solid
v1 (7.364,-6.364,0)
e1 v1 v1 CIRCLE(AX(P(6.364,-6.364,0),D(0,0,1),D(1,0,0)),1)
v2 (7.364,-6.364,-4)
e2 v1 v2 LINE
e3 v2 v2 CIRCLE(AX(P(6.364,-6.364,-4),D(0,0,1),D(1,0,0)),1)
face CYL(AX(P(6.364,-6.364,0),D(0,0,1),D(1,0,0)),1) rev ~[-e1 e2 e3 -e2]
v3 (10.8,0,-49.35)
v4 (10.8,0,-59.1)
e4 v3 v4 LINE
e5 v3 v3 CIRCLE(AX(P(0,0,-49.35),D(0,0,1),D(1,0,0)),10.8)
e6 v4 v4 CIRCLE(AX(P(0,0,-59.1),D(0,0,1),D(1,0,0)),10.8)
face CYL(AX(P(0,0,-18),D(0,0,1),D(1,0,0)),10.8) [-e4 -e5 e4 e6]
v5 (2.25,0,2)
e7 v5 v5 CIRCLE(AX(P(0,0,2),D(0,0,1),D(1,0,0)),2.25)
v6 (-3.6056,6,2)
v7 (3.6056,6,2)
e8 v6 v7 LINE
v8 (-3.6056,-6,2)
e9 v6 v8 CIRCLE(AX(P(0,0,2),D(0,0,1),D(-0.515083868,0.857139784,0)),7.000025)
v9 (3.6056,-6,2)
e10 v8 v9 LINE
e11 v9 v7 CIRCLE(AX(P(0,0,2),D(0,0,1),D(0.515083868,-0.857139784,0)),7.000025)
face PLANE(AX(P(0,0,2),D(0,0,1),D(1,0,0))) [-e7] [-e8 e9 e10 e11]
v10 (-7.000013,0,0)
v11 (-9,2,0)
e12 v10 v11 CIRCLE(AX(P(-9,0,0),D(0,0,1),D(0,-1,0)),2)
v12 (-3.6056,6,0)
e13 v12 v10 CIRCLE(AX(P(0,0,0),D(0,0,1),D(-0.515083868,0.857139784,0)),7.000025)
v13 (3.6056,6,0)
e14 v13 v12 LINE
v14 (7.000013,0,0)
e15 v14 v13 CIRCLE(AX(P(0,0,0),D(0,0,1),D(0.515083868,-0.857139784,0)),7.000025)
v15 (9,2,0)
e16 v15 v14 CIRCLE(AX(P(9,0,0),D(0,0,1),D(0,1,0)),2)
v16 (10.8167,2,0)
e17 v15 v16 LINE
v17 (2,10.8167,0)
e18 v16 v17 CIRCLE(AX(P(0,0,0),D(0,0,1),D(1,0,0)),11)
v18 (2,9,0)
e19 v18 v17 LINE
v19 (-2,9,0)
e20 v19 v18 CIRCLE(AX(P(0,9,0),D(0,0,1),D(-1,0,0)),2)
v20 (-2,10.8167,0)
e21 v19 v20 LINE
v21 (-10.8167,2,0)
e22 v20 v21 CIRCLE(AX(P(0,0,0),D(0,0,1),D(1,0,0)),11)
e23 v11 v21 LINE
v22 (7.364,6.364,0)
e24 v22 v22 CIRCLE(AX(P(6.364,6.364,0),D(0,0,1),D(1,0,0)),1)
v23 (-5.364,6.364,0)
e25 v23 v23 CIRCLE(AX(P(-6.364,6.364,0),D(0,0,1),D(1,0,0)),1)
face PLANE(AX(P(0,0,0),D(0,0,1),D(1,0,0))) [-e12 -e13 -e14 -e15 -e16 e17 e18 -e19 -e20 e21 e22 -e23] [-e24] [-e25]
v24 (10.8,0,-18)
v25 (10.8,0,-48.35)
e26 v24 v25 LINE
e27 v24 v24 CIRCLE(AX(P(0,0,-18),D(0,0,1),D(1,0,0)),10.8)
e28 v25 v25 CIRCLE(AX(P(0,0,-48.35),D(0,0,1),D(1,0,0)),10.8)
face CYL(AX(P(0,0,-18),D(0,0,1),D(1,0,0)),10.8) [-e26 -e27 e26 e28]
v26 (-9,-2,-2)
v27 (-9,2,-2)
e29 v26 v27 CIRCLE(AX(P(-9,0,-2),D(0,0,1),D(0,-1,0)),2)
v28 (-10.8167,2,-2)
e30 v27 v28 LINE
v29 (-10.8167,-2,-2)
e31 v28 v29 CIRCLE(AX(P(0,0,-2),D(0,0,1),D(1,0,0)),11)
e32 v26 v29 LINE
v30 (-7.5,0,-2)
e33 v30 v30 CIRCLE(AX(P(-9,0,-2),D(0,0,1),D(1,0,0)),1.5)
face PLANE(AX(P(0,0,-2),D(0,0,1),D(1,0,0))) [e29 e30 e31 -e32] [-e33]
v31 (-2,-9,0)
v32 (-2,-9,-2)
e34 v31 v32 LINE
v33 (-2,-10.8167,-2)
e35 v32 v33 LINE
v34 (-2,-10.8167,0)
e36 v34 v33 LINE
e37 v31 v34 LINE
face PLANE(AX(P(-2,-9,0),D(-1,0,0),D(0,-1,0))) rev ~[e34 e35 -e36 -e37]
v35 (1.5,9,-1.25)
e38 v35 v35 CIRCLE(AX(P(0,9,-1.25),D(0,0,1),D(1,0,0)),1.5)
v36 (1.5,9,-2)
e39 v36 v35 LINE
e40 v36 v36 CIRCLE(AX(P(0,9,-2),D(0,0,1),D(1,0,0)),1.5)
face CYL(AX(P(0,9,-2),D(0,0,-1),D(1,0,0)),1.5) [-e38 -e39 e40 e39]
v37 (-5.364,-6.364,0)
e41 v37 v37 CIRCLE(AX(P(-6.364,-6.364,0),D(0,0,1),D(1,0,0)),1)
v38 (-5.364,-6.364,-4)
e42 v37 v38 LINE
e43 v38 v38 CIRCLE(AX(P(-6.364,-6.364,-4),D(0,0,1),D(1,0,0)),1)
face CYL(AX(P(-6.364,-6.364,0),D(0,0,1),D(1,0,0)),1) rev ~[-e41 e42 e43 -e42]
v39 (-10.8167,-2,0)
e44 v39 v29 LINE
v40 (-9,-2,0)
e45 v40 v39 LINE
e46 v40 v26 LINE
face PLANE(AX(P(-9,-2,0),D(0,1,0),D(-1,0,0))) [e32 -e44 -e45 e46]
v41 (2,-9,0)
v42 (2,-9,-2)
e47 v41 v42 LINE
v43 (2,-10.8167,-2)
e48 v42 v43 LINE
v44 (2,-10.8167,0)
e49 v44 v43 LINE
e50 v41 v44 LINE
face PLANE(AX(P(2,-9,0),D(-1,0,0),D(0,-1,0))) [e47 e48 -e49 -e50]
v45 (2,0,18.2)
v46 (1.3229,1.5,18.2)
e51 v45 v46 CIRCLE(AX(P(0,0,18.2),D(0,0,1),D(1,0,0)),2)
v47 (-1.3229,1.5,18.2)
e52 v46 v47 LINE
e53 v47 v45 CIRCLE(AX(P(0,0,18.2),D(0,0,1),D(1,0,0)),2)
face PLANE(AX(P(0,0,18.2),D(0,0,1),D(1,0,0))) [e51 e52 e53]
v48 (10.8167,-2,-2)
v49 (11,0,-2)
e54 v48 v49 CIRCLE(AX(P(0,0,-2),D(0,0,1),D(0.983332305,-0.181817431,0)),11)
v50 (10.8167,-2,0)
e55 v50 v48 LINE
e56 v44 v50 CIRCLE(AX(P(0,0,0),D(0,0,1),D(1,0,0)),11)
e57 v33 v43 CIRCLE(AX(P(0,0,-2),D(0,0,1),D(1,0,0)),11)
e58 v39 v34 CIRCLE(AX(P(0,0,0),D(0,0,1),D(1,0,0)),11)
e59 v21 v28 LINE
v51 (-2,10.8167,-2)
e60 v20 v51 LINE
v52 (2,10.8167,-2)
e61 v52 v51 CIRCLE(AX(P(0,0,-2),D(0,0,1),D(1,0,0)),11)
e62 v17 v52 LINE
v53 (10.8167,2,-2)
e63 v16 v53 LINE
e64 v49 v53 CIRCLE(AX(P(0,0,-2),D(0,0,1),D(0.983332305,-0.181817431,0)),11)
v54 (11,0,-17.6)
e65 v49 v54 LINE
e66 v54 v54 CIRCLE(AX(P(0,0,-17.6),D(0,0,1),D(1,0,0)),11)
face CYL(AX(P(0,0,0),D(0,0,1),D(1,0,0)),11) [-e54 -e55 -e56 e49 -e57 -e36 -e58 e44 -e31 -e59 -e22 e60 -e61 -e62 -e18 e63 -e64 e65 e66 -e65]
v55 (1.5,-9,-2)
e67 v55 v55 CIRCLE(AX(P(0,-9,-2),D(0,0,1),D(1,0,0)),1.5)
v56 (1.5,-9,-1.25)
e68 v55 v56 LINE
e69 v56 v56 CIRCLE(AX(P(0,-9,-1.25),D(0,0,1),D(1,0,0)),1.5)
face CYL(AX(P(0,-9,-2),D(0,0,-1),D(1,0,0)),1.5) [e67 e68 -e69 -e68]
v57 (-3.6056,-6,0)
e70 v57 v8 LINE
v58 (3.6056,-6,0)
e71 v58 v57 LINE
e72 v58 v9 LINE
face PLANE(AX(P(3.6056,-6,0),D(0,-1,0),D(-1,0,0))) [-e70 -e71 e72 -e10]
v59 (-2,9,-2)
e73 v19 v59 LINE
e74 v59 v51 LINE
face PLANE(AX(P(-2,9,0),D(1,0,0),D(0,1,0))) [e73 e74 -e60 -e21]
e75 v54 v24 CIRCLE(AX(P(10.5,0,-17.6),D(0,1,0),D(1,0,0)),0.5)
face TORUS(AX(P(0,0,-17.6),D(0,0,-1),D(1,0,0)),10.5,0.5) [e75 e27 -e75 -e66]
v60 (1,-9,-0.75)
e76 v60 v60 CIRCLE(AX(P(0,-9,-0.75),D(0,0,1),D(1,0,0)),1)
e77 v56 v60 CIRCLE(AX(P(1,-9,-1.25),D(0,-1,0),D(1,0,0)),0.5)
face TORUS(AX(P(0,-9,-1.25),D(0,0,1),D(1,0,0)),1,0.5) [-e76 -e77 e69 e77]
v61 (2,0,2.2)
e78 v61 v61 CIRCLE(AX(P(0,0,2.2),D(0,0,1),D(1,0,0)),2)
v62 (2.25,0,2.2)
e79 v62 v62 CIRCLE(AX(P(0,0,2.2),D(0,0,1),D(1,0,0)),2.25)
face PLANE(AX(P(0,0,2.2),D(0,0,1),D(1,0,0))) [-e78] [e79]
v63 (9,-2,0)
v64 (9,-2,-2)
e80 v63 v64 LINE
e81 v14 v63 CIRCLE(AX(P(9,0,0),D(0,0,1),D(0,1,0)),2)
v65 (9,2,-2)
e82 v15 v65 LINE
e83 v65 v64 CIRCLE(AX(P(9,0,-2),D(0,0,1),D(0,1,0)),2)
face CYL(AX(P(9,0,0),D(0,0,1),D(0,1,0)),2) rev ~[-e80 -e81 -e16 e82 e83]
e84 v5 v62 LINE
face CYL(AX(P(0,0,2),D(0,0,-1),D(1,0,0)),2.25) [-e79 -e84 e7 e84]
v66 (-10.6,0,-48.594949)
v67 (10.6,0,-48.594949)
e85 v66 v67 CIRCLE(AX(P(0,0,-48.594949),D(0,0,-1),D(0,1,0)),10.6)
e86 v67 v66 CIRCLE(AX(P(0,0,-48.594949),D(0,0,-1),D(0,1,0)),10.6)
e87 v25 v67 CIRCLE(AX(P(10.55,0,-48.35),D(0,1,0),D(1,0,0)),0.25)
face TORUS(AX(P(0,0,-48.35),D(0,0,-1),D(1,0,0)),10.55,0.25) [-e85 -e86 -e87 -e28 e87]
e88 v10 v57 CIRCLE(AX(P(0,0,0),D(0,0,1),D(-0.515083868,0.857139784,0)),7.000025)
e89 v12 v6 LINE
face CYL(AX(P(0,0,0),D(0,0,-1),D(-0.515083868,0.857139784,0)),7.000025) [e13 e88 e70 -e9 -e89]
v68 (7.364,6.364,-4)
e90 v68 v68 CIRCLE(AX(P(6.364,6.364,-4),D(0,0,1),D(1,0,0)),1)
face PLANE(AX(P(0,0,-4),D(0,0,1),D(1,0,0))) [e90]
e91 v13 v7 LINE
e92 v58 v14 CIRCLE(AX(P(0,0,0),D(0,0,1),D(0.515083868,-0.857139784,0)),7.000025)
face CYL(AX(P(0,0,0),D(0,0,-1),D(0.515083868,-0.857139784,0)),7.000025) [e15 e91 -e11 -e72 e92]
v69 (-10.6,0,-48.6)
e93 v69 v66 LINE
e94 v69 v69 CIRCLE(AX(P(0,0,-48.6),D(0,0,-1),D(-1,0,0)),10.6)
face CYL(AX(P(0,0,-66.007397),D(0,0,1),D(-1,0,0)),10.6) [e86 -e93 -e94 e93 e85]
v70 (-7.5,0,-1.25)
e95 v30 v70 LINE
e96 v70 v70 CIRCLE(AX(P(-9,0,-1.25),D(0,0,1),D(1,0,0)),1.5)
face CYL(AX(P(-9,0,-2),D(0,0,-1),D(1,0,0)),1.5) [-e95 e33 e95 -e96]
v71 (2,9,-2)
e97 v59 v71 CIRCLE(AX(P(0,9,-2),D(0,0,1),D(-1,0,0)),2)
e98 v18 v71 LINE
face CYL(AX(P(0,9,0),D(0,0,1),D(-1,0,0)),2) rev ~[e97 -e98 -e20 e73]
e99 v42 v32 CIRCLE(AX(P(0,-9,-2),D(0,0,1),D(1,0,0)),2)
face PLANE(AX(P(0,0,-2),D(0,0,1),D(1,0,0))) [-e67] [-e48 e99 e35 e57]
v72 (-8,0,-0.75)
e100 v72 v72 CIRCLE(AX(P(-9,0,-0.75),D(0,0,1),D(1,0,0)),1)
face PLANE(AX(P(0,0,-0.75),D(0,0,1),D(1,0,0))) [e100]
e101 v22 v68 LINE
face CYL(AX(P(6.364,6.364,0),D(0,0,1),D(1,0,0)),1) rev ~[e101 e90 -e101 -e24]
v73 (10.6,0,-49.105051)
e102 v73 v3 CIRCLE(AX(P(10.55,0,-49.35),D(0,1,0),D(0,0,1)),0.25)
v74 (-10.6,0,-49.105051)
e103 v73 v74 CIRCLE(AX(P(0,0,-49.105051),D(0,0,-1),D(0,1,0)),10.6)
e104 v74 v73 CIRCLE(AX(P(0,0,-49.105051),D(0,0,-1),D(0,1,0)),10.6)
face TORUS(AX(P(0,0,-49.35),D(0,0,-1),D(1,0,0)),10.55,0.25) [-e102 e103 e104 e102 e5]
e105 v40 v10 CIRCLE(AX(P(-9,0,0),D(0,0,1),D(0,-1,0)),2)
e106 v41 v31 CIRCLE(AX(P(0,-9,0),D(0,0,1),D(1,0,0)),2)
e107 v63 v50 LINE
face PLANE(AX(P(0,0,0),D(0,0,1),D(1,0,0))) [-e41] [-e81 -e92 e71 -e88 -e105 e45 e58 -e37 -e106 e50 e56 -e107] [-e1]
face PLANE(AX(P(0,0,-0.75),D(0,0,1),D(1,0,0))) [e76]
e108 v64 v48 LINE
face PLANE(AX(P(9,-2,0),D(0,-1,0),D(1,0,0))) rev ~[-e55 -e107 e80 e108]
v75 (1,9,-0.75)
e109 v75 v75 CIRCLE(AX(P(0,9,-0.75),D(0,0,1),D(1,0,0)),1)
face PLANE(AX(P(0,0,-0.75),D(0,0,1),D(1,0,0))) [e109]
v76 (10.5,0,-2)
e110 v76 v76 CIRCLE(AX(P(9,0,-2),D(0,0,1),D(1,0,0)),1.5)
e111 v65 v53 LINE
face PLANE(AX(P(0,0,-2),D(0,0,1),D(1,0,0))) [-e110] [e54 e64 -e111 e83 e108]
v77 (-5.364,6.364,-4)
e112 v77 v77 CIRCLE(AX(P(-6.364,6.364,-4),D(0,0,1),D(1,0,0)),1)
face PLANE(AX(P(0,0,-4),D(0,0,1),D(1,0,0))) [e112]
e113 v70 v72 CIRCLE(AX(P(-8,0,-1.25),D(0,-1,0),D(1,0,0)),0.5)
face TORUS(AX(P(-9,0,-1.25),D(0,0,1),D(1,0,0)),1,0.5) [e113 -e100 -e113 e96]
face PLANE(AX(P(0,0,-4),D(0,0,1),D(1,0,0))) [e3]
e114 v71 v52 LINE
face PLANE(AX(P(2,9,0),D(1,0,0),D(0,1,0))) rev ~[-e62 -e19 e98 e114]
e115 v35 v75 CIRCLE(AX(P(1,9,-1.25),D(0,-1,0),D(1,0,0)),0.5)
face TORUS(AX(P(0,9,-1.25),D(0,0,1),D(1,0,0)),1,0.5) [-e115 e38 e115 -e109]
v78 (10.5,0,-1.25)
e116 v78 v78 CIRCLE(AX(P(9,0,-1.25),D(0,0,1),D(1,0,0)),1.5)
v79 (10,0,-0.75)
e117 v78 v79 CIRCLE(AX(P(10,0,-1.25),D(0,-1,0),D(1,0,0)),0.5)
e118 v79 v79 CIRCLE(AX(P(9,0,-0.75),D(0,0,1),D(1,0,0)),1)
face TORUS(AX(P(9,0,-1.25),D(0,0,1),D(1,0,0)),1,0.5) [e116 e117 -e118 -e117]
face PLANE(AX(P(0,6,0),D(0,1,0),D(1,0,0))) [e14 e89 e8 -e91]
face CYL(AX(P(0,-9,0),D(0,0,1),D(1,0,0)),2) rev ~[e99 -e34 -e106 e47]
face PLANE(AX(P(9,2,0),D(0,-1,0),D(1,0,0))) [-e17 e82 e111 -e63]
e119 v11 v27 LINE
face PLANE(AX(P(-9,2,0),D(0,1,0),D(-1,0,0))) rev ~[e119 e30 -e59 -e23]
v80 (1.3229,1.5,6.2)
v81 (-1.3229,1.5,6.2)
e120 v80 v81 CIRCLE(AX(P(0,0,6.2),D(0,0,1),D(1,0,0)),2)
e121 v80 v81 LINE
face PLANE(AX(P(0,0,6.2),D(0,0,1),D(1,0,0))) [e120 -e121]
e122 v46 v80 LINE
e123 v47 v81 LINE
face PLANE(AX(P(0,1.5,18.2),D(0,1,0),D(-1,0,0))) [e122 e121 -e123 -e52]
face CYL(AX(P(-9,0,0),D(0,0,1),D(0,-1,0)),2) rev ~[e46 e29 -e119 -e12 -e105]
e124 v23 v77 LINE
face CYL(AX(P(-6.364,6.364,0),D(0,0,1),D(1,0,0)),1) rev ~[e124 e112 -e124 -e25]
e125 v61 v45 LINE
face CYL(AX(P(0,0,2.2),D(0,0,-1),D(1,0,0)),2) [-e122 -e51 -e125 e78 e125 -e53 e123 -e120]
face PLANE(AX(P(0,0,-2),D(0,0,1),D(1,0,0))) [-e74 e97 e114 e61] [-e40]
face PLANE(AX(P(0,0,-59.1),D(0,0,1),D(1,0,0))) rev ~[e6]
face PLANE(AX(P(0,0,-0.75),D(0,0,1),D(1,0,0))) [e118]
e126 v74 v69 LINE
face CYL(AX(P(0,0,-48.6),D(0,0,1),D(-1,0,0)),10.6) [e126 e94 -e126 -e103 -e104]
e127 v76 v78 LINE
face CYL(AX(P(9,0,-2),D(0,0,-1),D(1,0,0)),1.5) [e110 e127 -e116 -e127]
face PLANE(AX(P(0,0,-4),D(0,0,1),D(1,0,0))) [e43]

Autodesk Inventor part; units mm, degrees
ref_plane "YZ Plane" through (0, 0, 0) normal (1, 0, 0) x (0, 1, 0)
sketch "Sketch1" plane through (0, 0, 0) normal (0, 0, 1) x (1, 0, 0)
  circle A0 centre (0, 0) radius 11
  dimension "d0" = 22
extrude "Extrusion1" add sketch "Sketch1" against normal blind 59.1
sketch "Sketch9" plane through (0, 0, 0) normal (0, 0, 1) x (1, 0, 0)
  line L0 (0, 6) -> (0, -6)
  line L1 (-3.6056, 6) -> (3.6056, 6)
  line L2 (3.6056, -6) -> (-3.6056, -6)
  arc A0 (-3.6056, 6) -> (-3.6056, -6) centre (0, 0) ccw
  arc A1 (3.6056, -6) -> (3.6056, 6) centre (0, 0) ccw
  dimension "d19" = 6
  dimension "d20" = 12
extrude "Extrusion5" add sketch "Sketch9" along normal blind 2
sketch "Sketch10" plane through (0, 0, 2) normal (0, 0, 1) x (1, 0, 0)
  circle A0 centre (0, 0) radius 2.25
  dimension "d23" = 4.5
extrude "Extrusion6" add sketch "Sketch10" along normal blind 0.2
sketch "Sketch11" plane through (0, 0, 2.2) normal (0, 0, 1) x (1, 0, 0)
  circle A0 centre (0, 0) radius 2
  dimension "d26" = 4
extrude "Extrusion7" add sketch "Sketch11" along normal blind 16
sketch "Sketch12" plane through (0, 0, 18.2) normal (0, 0, 1) x (1, 0, 0)
  circle A0 centre (0, 0) radius 2
  line L0 (0, -2) -> (0, 1.5)
  line L1 (1.3229, 1.5) -> (-1.3229, 1.5)
  dimension "d29" = 3.5
extrude "Extrusion8" cut sketch "Sketch12" against normal blind 12 contours L1 A0
ref_plane "Work Plane1" through (0, 0, -18) normal (0, 0, 1) x (1, 0, 0)
sketch "Sketch13" plane through (0, 0, -18) normal (0, 0, 1) x (1, 0, 0)
  circle A0 centre (0, 0) radius 10.8
  circle A1 centre (0, 0) radius 11 projected
  dimension "d33" = 21.6
extrude "Extrusion9" cut sketch "Sketch13" against normal up to surface (41.1 mm away)
ref_plane "Work Plane2" through (0, 0, -48.6) normal (0, 0, -1) x (-1, 0, 0)
sketch "Sketch14" plane through (0, 0, -48.6) normal (0, 0, -1) x (-1, 0, 0)
  circle A0 centre (0, 0) radius 10.6
  circle A1 centre (0, 0) radius 10.8 projected
  dimension "d37" = 21.2
extrude "Extrusion10" cut sketch "Sketch14" along normal blind 0.5
fillet "Fillet1" radius 0.5 1 edges at (-11, 0, -18)
fillet "Fillet2" radius 0.25 1 edges at (-10.8, 0, -49.1)
fillet "Fillet3" radius 0.25 1 edges at (-10.8, 0, -48.6)
sketch "Sketch15" plane through (0, 0, 0) normal (0, 0, 1) x (1, 0, 0)
  circle A0 centre (0, 0) radius 11 projected
  circle A1 centre (0, 0) radius 9 construction
  circle A2 centre (0, 9) radius 1.25 construction
  circle A3 centre (-9, 0) radius 1.25 construction
  circle A4 centre (9, 0) radius 1.25 construction
  circle A5 centre (0, -9) radius 1.25 construction
  line L0 (0, 0) -> (12, 12) construction
  line L1 (0, 0) -> (16.9706, 0) construction
  line L2 (12, 12) -> (-9, -9) construction
  line L3 (0, 0) -> (10, -10) construction
  line L4 (0, 0) -> (14.1421, 0) construction
  line L5 (10, -10) -> (-10.25, 10.25) construction
  circle A6 centre (6.364, 6.364) radius 1
  circle A7 centre (-6.364, 6.364) radius 1
  circle A8 centre (-6.364, -6.364) radius 1
  circle A9 centre (6.364, -6.364) radius 1
  dimension "d43" = 18
  dimension "d44" = 2.5
  dimension "d45" = 2.5
  dimension "d46" = 2.5
  dimension "d47" = 2.5
  dimension "d48" = 45
  dimension "d49" = 45
  dimension "d50" = 2
  dimension "d51" = 2
  dimension "d52" = 2
  dimension "d53" = 2
extrude "Extrusion11" cut sketch "Sketch15" against normal blind 4 contours A6 | A7 | A8 | A9
sketch "Sketch16" plane through (0, 0, 0) normal (0, 0, 1) x (1, 0, 0)
  circle A0 centre (0, 0) radius 9 construction
  circle A1 centre (0, 0) radius 11 projected
  line L0 (-2, 9) -> (-2, 10.8167)
  line L1 (2, 9) -> (2, 10.8167)
  arc A2 (-2, 9) -> (2, 9) centre (0, 9) ccw
  line L2 (-2, -9) -> (-2, -10.8167)
  line L3 (2, -9) -> (2, -10.8167)
  arc A3 (2, -9) -> (-2, -9) centre (0, -9) ccw
  arc A4 (-9, -2) -> (-9, 2) centre (-9, 0) ccw
  line L4 (-9, 2) -> (-10.8167, 2)
  line L5 (-9, -2) -> (-10.8167, -2)
  line L6 (0, 0) -> (0, 2)
  arc A5 (9, 2) -> (9, -2) centre (9, 0) ccw
  line L7 (9, 2) -> (10.8167, 2)
  line L8 (9, -2) -> (10.8167, -2)
  arc A6 (2, 10.8167) -> (-2, 10.8167) centre (0, 0) ccw
  arc A7 (-10.8167, 2) -> (-10.8167, -2) centre (0, 0) ccw
  arc A8 (10.8167, -2) -> (10.8167, 2) centre (0, 0) ccw
  arc A9 (-2, -10.8167) -> (2, -10.8167) centre (0, 0) ccw
  dimension "d56" = 18
  dimension "d58" = 4
extrude "Extrusion12" cut sketch "Sketch16" against normal blind 2 contours A1 L8 A5 L7 | L1 A2 L0 A1 | A1 L2 A3 L3 | L4 A4 L5 A1
sketch "Sketch17" plane through (0, 0, -2) normal (0, 0, 1) x (1, 0, 0)
  circle A0 centre (0, 0) radius 9 construction
  circle A1 centre (0, 9) radius 1.5 construction
  circle A2 centre (0, 9) radius 1.5
  circle A3 centre (-9, 0) radius 1.5
  circle A4 centre (0, -9) radius 1.5
  circle A5 centre (9, 0) radius 1.5
  dimension "d61" = 18
  dimension "d62" = 3
  dimension "d63" = 3
  dimension "d64" = 3
  dimension "d65" = 3
extrude "Extrusion13" add sketch "Sketch17" along normal blind 1.25
fillet "Fillet4" radius 0.5 4 edges at (-1.5, 9, -0.75) (7.5, 0, -0.75) (-1.5, -9, -0.75) (-10.5, 0, -0.75)
properties part number "730RPM Motor Mockup"
